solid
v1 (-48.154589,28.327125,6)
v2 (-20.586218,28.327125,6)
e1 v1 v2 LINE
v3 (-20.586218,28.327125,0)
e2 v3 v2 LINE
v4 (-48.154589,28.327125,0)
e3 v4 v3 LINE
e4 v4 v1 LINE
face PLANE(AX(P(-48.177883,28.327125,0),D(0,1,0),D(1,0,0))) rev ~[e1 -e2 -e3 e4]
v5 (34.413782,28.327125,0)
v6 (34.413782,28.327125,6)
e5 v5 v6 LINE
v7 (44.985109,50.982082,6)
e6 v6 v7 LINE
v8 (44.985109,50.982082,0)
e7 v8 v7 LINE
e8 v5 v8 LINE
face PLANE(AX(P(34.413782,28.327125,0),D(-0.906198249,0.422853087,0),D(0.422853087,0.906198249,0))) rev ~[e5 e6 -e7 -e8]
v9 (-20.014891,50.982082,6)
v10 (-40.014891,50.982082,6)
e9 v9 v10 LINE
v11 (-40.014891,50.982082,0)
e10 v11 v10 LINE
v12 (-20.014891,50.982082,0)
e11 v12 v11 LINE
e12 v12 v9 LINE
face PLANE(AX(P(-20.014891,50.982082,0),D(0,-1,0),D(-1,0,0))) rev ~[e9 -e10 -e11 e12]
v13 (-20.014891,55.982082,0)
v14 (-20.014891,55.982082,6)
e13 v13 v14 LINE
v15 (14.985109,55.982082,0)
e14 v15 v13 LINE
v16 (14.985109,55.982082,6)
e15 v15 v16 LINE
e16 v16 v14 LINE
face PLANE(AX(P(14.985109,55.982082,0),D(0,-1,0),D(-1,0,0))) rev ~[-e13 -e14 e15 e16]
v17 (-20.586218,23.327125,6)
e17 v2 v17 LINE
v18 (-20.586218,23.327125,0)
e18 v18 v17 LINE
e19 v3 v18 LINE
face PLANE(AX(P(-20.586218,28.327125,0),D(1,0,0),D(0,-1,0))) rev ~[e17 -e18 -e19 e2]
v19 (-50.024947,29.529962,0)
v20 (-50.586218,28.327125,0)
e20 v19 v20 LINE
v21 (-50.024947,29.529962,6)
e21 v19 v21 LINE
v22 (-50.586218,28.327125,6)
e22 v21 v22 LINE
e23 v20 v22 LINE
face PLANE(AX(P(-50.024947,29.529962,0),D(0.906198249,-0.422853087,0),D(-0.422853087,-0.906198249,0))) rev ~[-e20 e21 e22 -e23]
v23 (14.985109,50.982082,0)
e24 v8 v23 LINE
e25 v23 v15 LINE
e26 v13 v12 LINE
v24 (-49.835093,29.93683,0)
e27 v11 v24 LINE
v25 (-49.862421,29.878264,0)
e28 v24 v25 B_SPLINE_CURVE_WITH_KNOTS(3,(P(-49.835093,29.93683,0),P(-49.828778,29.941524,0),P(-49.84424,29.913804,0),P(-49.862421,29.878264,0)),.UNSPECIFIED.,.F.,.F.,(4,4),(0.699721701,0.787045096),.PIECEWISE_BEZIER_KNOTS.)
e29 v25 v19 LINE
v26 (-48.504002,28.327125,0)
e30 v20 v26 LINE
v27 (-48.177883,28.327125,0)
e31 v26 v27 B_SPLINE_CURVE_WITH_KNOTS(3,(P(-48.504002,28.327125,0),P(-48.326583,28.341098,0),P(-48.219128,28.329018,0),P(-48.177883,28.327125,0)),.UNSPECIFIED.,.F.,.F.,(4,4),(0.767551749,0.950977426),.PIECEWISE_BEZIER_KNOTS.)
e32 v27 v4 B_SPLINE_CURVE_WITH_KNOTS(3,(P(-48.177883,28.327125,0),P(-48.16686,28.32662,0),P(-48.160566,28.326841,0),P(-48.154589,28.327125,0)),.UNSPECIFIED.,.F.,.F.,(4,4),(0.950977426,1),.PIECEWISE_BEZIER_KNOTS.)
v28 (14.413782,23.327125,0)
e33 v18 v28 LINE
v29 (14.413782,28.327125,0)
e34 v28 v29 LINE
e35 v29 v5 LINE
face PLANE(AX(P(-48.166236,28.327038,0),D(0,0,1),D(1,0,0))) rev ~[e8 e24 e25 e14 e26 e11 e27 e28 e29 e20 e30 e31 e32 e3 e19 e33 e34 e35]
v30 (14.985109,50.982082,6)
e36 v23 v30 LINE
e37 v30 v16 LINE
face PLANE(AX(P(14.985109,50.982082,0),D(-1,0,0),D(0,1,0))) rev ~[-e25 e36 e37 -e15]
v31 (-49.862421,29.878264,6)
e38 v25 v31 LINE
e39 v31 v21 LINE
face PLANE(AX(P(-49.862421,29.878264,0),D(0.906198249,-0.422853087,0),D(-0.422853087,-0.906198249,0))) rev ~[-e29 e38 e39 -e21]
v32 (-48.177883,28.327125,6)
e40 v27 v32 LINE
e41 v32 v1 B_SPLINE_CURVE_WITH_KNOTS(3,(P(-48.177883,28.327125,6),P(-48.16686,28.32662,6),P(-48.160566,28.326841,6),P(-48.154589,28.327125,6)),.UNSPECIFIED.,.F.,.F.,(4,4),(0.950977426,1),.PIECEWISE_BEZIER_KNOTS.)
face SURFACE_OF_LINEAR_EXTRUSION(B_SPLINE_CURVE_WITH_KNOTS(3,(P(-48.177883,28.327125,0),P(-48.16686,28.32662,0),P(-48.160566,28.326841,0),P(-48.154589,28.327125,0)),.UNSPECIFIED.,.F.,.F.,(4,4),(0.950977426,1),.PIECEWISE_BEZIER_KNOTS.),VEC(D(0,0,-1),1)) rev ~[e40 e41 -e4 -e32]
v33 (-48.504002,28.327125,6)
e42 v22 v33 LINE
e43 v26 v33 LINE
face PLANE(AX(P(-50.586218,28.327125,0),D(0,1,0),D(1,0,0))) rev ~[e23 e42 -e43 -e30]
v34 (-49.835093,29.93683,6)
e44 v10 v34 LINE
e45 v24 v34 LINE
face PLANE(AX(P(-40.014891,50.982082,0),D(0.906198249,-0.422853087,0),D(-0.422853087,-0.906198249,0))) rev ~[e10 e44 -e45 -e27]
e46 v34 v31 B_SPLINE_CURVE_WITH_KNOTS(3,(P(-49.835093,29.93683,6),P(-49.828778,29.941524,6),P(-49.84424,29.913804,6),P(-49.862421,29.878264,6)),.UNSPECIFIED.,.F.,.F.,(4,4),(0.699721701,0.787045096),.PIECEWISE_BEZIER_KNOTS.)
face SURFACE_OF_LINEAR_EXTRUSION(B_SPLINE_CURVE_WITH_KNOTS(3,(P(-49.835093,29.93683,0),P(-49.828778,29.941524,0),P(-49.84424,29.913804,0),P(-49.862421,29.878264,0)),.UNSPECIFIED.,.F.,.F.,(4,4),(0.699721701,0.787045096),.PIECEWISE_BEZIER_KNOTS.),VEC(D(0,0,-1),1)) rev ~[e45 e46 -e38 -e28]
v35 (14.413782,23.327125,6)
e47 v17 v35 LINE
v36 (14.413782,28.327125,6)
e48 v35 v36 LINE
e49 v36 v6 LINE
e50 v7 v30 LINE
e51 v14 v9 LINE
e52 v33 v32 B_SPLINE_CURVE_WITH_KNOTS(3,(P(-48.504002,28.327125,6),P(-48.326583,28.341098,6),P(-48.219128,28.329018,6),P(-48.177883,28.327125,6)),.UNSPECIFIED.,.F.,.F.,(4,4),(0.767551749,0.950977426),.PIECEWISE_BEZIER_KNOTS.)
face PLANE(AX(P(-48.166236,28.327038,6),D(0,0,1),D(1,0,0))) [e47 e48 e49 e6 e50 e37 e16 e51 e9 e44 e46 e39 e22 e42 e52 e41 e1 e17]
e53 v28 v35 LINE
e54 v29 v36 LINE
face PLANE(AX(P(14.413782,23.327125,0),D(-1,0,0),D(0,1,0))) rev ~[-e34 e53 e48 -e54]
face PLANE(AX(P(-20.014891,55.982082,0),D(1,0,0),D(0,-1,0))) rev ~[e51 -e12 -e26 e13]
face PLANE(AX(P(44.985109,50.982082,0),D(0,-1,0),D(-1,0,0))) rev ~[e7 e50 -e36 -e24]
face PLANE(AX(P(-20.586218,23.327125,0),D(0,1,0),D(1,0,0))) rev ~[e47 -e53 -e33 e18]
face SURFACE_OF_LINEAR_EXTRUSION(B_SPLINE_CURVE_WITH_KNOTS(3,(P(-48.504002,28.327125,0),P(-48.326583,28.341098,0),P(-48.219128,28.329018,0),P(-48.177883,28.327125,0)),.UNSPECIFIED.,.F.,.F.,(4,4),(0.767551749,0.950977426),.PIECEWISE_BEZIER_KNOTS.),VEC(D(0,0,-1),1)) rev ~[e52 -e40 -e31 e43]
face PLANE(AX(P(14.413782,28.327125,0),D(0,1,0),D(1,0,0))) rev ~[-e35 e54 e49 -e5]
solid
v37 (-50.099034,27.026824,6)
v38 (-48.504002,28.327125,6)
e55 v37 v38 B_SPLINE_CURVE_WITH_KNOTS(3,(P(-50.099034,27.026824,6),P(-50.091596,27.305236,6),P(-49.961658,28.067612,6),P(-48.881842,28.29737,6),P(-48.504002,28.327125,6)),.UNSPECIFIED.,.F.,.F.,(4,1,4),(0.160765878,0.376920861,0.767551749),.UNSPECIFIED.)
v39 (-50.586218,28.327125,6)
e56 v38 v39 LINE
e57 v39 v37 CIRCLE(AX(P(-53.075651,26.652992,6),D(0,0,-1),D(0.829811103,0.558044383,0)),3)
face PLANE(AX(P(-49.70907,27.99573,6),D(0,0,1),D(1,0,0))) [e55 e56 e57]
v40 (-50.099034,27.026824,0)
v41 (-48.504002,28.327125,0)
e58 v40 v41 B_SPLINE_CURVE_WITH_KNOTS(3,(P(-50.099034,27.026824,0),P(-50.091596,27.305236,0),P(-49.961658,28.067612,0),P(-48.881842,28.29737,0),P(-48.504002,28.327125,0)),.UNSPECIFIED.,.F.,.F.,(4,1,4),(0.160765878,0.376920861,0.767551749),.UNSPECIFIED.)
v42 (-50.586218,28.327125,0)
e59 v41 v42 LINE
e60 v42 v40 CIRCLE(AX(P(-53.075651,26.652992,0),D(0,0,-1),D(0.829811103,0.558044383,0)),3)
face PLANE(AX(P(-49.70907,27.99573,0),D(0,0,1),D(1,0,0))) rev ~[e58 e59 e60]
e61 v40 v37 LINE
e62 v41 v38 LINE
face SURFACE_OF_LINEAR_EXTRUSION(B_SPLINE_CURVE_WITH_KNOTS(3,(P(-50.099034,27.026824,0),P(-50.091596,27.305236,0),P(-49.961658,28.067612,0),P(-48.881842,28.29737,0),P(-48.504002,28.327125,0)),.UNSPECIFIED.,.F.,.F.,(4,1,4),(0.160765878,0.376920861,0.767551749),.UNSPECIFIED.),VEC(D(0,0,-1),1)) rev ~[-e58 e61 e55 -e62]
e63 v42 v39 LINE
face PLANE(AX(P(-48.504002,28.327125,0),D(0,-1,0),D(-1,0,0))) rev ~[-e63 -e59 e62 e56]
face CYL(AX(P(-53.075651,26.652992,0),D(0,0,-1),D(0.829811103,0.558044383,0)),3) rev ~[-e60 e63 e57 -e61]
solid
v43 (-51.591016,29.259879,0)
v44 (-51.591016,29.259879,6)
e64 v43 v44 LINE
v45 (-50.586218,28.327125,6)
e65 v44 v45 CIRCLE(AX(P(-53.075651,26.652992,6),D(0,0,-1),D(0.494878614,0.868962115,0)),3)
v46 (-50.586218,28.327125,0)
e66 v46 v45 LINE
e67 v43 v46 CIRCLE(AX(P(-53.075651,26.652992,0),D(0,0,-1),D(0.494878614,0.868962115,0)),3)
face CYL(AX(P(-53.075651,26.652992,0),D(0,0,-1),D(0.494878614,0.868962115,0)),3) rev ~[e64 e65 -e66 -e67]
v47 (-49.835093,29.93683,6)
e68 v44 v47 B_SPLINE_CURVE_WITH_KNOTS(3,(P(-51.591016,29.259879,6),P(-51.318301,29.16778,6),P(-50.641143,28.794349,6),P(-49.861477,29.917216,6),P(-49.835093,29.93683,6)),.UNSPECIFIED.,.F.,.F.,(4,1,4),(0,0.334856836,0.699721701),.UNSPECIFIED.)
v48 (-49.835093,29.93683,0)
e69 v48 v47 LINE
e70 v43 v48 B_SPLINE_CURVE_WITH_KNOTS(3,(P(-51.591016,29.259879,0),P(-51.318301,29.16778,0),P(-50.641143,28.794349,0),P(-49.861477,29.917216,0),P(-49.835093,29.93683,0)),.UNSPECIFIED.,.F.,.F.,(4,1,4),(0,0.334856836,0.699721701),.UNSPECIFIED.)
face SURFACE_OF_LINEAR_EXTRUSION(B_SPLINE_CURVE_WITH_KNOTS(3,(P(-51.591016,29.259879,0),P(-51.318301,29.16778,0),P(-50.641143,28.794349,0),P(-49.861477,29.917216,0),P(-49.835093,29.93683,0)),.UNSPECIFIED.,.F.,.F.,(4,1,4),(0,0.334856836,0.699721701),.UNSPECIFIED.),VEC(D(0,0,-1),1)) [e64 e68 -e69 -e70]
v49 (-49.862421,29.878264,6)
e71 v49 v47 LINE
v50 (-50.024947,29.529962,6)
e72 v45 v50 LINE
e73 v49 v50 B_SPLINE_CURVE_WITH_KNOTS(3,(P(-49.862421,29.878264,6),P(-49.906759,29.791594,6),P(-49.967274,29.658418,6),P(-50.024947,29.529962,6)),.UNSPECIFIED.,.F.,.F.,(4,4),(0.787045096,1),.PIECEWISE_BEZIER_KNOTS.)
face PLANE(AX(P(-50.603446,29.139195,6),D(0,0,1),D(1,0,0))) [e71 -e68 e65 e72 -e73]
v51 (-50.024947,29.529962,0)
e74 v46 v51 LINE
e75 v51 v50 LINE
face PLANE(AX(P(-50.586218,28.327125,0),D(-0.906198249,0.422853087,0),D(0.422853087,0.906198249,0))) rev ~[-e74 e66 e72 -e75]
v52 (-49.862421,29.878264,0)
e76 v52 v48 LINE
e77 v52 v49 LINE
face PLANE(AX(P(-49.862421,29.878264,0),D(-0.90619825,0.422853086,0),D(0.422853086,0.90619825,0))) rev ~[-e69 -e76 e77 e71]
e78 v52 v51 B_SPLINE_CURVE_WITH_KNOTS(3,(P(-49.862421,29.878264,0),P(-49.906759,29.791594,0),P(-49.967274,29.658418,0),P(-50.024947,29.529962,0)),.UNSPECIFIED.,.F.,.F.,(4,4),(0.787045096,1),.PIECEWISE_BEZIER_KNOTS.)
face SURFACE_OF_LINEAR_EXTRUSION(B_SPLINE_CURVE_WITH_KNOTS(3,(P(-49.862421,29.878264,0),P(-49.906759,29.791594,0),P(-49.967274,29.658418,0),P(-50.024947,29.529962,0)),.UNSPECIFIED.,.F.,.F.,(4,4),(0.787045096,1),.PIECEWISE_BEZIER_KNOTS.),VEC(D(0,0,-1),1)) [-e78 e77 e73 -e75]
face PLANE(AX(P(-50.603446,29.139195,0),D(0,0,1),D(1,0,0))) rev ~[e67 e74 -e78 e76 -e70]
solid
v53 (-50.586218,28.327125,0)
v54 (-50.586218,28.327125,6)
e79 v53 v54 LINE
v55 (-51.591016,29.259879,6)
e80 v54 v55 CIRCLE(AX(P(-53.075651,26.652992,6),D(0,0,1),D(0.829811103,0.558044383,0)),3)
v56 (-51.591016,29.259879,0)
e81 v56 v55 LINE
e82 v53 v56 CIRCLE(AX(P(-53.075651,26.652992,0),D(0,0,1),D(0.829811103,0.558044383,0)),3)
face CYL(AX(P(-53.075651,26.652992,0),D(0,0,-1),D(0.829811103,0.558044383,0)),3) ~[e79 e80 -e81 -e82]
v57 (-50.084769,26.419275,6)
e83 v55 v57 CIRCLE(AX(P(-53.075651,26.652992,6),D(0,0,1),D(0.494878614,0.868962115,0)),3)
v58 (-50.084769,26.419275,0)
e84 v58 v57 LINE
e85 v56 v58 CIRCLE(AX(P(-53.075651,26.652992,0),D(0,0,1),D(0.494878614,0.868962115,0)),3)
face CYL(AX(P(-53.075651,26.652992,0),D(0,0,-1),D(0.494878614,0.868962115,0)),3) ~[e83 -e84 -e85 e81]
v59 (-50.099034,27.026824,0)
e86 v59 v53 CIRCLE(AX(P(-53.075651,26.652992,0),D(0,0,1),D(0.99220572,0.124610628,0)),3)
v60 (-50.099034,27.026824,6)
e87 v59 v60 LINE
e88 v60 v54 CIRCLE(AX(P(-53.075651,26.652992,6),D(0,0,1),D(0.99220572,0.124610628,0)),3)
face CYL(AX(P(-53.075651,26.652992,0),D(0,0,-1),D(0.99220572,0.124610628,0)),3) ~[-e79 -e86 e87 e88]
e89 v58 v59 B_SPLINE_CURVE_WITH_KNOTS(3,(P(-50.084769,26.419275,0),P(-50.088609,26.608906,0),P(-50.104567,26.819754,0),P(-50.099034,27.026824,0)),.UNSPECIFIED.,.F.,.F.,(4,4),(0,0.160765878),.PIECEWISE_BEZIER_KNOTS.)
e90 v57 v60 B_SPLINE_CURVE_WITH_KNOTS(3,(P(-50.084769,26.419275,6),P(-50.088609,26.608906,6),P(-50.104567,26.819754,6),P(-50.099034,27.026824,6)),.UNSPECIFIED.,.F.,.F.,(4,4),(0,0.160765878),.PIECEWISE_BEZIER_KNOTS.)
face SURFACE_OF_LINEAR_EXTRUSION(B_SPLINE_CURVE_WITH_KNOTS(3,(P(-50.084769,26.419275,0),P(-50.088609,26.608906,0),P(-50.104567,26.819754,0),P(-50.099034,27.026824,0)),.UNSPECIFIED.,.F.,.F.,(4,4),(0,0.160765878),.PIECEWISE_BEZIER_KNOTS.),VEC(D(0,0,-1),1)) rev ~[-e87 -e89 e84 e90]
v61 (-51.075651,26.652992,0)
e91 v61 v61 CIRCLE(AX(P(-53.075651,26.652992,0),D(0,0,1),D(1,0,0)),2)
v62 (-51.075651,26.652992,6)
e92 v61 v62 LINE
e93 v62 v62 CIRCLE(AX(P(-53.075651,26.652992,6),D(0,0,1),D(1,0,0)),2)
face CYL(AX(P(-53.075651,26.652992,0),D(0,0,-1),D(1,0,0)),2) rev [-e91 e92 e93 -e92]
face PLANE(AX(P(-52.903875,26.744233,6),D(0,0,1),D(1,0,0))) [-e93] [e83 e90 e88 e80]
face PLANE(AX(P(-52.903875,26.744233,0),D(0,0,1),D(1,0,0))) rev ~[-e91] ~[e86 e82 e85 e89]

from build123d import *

# Parameters (mm, degrees)
F1_DEPTH = 6
F0_R     = 2
F2_DEPTH = 6


with BuildPart() as f1:
    # F0 (on Top) → F1 (new body)
    with BuildSketch(Plane.XY):
        with BuildLine():
            Line((-50.0249465513, 29.52996234), (-50.5862181266, 28.3271253868))
            Line((-50.5862181266, 28.3271253868), (-48.5040023923, 28.3271253868))
            add(Edge.make_bspline(
                [(-48.5040023923, 28.3271253868), (-48.3265830997, 28.3410976173), (-48.2191282446, 28.3290178572), (-48.177883029, 28.3271253868)],
                knots=[0.7675517488, 0.7675517488, 0.7675517488, 0.7675517488, 0.9509774258, 0.9509774258, 0.9509774258, 0.9509774258], degree=3))
            Line((-48.177883029, 28.3271253868), (-48.1545887887, 28.3271253868))
            Line((-48.1545887887, 28.3271253868), (-20.5862181266, 28.3271253868))
            Line((-20.5862181266, 28.3271253868), (-20.5862181266, 23.3271253868))
            Line((-20.5862181266, 23.3271253868), (14.4137818734, 23.3271253868))
            Line((14.4137818734, 23.3271253868), (14.4137818734, 28.3271253868))
            Line((14.4137818734, 28.3271253868), (34.4137818734, 28.3271253868))
            Line((34.4137818734, 28.3271253868), (44.9851090482, 50.9820816164))
            Line((44.9851090482, 50.9820816164), (14.9851090482, 50.9820816164))
            Line((14.9851090482, 50.9820816164), (14.9851090482, 55.9820816164))
            Line((14.9851090482, 55.9820816164), (-20.0148909518, 55.9820816164))
            Line((-20.0148909518, 55.9820816164), (-20.0148909518, 50.9820816164))
            Line((-20.0148909518, 50.9820816164), (-40.0148909518, 50.9820816164))
            Line((-40.0148909518, 50.9820816164), (-49.8350928217, 29.9368296959))
            add(Edge.make_bspline(
                [(-49.8350928217, 29.9368296959), (-49.8287783598, 29.9415238557), (-49.8442396119, 29.9138038591), (-49.8624208334, 29.8782642102)],
                knots=[0.6997217006, 0.6997217006, 0.6997217006, 0.6997217006, 0.7870450964, 0.7870450964, 0.7870450964, 0.7870450964], degree=3))
            Line((-49.8624208334, 29.8782642102), (-50.0249465513, 29.52996234))
        make_face()
    extrude(amount=F1_DEPTH)

    # F0 (on Top) → F2, piece 3 (join)
    with BuildSketch(Plane.XY):
        with BuildLine():
            Line((-48.1545887887, 28.3271253868), (-48.177883029, 28.3271253868))
            add(Edge.make_bspline(
                [(-48.177883029, 28.3271253868), (-48.1668597814, 28.3266196028), (-48.1605657938, 28.3268414823), (-48.1545887887, 28.3271253868)],
                knots=[0.9509774258, 0.9509774258, 0.9509774258, 0.9509774258, 1, 1, 1, 1], degree=3))
        make_face()
    extrude(amount=F2_DEPTH)


with BuildPart() as f1b:
    # F0 (on Top) → F1, piece 2 (new body)
    with BuildSketch(Plane.XY):
        with BuildLine():
            ThreePointArc((-50.0990342752, 27.0268241237), (-50.2663592156, 27.7055497053), (-50.5862181266, 28.3271253868))
            ThreePointArc((-50.5862181266, 28.3271253868), (-51.0346189675, 28.851670583), (-51.5910155934, 29.2598785833))
            ThreePointArc((-51.5910155934, 29.2598785833), (-55.7260895801, 25.2475821047), (-50.0847692352, 26.4192751848))
            add(Edge.make_bspline(
                [(-50.0847692352, 26.4192751848), (-50.0886085443, 26.6089058035), (-50.1045665089, 26.8197544117), (-50.0990342752, 27.0268241237)],
                knots=[0, 0, 0, 0, 0.1607658778, 0.1607658778, 0.1607658778, 0.1607658778], degree=3))
        make_face()
        with Locations((-53.0756514359, 26.6529922385)):
            Circle(F0_R, mode=Mode.SUBTRACT)
    extrude(amount=F1_DEPTH)


with BuildPart() as f2:
    # F0 (on Top) → F2 (new body)
    with BuildSketch(Plane.XY):
        with BuildLine():
            ThreePointArc((-51.5910155934, 29.2598785833), (-51.0346189675, 28.851670583), (-50.5862181266, 28.3271253868))
            Line((-50.5862181266, 28.3271253868), (-50.0249465513, 29.52996234))
            add(Edge.make_bspline(
                [(-49.8624208334, 29.8782642102), (-49.9067592406, 29.7915939378), (-49.9672739064, 29.6584184674), (-50.0249465513, 29.52996234)],
                knots=[0.7870450964, 0.7870450964, 0.7870450964, 0.7870450964, 1, 1, 1, 1], degree=3))
            Line((-49.8624208334, 29.8782642102), (-49.8350928217, 29.9368296959))
            add(Edge.make_bspline(
                [(-51.5910155934, 29.2598785833), (-51.3183012558, 29.1677802311), (-50.6411432567, 28.7943490334), (-49.8614766476, 29.9172160064), (-49.8350928217, 29.9368296959)],
                knots=[0, 0, 0, 0, 0.3348568359, 0.6997217006, 0.6997217006, 0.6997217006, 0.6997217006], degree=3))
        make_face()
    extrude(amount=F2_DEPTH)


with BuildPart() as f2b:
    # F0 (on Top) → F2, piece 2 (new body)
    with BuildSketch(Plane.XY):
        with BuildLine():
            Line((-48.5040023923, 28.3271253868), (-50.5862181266, 28.3271253868))
            ThreePointArc((-50.5862181266, 28.3271253868), (-50.2663592156, 27.7055497053), (-50.0990342752, 27.0268241237))
            add(Edge.make_bspline(
                [(-50.0990342752, 27.0268241237), (-50.091596006, 27.3052361266), (-49.9616584893, 28.0676117598), (-48.8818418367, 28.2973695484), (-48.5040023923, 28.3271253868)],
                knots=[0.1607658778, 0.1607658778, 0.1607658778, 0.1607658778, 0.3769208605, 0.7675517488, 0.7675517488, 0.7675517488, 0.7675517488], degree=3))
        make_face()
    extrude(amount=F2_DEPTH)


solid = Compound([f1.part, f1b.part, f2.part, f2b.part])
